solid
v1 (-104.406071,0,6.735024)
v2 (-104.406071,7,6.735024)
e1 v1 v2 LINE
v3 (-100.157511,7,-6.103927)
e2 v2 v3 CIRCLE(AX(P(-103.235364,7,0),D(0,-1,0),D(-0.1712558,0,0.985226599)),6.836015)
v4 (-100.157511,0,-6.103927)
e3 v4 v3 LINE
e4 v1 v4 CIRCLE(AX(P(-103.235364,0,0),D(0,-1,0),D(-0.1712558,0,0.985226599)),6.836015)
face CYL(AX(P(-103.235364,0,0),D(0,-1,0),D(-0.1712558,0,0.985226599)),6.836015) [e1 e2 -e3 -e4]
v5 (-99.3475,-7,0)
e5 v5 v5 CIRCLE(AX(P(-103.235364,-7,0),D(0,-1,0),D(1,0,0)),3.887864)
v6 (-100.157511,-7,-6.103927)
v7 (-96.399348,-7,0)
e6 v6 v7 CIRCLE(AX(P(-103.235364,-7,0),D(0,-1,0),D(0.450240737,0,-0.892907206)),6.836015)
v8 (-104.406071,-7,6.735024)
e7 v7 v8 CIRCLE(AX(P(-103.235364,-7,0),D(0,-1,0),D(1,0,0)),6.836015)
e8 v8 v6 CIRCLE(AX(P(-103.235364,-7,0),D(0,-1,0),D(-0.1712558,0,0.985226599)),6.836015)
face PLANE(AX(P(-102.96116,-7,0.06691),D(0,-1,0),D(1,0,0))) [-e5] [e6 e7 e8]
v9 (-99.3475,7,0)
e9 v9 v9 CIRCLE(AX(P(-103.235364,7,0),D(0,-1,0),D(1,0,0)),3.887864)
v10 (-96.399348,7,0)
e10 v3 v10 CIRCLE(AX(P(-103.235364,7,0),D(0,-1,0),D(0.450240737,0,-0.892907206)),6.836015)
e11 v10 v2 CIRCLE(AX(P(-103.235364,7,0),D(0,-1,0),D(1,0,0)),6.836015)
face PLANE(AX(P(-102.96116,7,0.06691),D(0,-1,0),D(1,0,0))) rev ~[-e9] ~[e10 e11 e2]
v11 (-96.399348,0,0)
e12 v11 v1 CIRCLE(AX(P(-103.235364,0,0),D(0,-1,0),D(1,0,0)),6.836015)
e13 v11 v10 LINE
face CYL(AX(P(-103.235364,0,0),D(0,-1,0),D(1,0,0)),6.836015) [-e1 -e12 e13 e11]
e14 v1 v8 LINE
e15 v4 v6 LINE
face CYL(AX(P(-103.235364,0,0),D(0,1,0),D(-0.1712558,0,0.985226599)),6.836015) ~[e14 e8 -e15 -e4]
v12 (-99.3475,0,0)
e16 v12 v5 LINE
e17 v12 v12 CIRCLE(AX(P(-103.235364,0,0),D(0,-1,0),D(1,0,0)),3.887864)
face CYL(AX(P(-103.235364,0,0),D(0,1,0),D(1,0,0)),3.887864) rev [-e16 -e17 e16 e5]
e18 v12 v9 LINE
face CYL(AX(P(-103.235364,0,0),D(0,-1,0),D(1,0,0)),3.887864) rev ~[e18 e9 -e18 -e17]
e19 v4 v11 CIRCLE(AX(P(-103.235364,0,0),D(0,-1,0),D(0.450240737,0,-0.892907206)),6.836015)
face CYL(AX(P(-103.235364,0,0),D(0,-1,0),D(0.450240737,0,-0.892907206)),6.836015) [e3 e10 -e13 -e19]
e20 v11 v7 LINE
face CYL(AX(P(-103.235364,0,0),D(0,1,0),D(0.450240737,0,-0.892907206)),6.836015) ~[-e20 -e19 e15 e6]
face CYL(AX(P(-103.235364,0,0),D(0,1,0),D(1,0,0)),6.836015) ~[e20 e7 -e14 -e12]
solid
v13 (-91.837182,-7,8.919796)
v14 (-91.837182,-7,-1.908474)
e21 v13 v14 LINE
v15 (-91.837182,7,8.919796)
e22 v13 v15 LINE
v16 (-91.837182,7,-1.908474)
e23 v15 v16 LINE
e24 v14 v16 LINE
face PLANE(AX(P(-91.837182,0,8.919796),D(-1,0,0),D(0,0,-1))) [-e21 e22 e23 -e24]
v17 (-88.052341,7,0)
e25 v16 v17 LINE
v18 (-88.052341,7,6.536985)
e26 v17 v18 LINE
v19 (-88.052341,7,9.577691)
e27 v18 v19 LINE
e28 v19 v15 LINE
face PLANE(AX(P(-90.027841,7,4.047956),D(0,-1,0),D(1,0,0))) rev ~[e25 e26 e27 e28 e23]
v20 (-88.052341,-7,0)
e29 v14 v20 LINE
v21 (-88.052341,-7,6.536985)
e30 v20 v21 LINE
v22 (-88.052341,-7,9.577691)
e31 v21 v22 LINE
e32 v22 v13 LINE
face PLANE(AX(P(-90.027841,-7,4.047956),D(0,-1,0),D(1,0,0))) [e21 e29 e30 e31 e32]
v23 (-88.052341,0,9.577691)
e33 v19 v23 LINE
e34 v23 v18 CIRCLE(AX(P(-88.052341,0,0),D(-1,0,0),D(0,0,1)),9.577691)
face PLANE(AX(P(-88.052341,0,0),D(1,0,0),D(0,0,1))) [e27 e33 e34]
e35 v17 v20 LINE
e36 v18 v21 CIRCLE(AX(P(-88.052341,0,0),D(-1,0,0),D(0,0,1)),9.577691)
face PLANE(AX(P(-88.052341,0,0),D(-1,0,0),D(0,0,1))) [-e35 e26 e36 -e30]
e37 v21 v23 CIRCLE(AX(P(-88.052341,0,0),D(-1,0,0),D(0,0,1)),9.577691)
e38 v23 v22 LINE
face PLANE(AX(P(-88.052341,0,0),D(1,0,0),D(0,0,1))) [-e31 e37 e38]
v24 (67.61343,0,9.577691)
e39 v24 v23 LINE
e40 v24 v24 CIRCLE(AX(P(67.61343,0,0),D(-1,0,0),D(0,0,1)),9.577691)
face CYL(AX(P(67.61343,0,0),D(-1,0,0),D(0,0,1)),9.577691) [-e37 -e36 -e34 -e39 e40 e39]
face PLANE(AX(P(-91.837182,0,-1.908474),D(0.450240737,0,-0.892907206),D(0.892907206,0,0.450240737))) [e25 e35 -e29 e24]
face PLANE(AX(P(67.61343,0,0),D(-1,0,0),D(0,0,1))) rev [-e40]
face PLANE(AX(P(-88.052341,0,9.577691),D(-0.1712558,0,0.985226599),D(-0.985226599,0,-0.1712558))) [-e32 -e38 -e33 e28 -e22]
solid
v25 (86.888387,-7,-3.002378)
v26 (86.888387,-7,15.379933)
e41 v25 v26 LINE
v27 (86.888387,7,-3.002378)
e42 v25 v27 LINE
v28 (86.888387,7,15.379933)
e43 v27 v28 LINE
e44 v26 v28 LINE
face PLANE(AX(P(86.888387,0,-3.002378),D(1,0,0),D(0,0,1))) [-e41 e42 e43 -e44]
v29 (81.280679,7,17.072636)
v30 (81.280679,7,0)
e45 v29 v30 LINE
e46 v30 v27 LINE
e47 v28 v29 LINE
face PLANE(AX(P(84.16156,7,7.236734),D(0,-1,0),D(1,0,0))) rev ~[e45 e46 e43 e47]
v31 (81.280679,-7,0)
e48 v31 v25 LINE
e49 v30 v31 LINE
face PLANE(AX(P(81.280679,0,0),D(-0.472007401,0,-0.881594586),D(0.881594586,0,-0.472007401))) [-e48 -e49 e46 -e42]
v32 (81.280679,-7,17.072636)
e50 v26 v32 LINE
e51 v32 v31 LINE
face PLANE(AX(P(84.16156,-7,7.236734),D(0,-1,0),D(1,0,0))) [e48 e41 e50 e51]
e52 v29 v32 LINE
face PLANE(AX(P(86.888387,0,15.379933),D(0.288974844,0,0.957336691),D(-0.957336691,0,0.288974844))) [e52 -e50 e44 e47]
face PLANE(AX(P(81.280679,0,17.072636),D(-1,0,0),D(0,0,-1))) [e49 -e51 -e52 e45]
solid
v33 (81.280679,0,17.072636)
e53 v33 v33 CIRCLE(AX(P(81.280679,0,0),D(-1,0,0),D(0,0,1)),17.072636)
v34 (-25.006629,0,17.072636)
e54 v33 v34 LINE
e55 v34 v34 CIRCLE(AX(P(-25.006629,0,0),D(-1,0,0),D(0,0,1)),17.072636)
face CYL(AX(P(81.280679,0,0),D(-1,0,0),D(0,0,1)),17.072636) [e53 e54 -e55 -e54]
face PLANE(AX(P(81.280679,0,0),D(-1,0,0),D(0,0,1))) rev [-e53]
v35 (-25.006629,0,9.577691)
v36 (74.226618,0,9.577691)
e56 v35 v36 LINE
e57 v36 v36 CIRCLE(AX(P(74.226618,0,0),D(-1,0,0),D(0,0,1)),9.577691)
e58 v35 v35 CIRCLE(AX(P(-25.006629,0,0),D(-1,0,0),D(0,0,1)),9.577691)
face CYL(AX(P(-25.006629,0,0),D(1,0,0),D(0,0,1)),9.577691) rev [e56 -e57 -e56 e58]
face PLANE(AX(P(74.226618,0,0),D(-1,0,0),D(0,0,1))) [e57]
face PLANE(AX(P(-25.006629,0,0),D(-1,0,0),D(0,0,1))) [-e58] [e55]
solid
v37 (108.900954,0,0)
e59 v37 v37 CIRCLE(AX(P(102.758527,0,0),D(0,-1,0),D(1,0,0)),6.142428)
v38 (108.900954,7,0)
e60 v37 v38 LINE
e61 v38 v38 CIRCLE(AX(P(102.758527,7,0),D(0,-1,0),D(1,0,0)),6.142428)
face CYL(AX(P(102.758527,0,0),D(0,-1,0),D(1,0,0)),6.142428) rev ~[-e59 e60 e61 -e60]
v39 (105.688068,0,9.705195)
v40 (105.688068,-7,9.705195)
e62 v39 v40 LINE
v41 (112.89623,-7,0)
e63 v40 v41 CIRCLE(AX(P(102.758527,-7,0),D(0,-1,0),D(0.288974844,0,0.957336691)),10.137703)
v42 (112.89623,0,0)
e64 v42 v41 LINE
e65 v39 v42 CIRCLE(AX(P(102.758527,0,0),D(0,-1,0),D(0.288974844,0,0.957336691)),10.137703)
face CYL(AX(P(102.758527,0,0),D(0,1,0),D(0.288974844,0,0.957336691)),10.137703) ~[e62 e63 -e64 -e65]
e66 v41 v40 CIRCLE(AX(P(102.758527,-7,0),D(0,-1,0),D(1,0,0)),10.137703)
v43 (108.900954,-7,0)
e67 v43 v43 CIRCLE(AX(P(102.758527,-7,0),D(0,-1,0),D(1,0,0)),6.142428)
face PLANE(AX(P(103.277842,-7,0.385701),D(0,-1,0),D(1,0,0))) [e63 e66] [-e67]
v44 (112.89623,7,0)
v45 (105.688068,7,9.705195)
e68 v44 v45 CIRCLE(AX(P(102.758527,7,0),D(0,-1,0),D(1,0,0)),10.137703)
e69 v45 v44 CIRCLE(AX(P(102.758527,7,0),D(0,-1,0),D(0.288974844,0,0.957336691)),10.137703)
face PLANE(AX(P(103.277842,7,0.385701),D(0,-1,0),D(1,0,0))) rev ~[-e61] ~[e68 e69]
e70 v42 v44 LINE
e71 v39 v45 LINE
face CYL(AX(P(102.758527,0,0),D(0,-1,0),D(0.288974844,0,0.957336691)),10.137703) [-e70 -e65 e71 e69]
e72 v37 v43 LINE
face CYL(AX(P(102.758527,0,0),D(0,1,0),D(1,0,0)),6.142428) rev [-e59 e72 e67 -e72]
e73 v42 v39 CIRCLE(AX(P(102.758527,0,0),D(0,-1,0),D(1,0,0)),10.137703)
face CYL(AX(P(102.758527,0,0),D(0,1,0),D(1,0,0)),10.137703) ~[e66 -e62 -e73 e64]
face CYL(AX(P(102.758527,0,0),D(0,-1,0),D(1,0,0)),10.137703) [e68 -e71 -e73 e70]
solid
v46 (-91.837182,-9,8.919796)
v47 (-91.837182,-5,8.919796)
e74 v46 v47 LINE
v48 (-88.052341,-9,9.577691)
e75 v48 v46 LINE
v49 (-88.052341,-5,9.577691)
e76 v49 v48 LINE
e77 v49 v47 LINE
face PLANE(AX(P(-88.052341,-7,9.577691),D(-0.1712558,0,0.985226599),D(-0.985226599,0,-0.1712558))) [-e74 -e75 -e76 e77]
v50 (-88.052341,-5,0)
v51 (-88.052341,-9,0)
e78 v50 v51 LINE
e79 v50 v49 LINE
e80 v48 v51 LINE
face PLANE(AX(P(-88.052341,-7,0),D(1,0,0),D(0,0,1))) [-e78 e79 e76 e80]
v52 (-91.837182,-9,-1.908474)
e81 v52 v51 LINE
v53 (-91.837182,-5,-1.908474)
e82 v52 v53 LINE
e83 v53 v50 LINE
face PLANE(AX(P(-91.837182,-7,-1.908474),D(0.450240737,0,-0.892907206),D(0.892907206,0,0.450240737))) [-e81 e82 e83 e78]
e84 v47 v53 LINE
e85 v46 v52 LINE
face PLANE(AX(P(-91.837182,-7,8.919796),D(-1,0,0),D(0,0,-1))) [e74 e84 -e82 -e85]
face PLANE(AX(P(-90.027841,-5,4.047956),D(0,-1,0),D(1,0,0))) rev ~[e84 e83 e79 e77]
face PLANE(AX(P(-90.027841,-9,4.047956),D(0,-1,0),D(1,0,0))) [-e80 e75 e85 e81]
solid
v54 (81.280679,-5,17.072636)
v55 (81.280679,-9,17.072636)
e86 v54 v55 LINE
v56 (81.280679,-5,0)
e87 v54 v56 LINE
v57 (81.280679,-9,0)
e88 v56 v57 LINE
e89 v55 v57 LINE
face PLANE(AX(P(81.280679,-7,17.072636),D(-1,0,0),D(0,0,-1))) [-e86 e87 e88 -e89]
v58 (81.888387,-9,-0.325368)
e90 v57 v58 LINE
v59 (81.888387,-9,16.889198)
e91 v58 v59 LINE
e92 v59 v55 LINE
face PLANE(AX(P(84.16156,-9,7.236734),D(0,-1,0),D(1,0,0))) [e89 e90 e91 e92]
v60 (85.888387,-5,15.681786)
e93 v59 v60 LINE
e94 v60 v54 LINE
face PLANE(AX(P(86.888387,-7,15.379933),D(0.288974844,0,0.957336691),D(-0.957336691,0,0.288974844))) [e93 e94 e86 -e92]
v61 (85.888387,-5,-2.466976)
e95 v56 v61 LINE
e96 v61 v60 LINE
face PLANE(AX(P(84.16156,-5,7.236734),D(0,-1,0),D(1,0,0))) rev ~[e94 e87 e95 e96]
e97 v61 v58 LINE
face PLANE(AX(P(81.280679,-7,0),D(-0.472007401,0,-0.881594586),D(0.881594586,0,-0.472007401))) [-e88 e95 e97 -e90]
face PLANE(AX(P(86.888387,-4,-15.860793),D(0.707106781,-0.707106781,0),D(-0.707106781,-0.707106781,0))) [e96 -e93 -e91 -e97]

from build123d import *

# Parameters (mm, degrees)
F3_DEPTH    = 7
F0_R        = 3.8878640564
F0_R_2      = 6.1424275905
F4_DEPTH    = 2
F5_T1_DEPTH = 44.0991409969


# Not quite as in the source:
# - a fillet or chamfer that OpenCascade refuses, or shapes differently, is made with other operations: its cross-section is extruded or revolved along the edge and cut away or added


with BuildPart() as f1:
    # F0 (on Front) → F1 (revolve)
    with BuildSketch(Plane.XZ):
        Polygon((-25.0066287739, 17.072636364), (-25.0066287739, 9.5776912849), (67.6134303212, 9.5776912849), (74.2266178131, 9.5776912849), (74.2266178131, 0), (81.2806785107, 0), (81.2806785107, 17.072636364), align=None)
    revolve(axis=Axis((-10.2194553203, 0, 0), (-1, 0, 0)))


with BuildPart() as f2:
    # F0 (on Front) → F2 (revolve)
    with BuildSketch(Plane.XZ):
        Polygon((-88.0523409618, 9.5776912849), (-88.0523409618, 0), (67.6134303212, 0), (67.6134303212, 9.5776912849), (-25.0066287739, 9.5776912849), align=None)
    revolve(axis=Axis((-10.2194553203, 0, 0), (-1, 0, 0)))

    # F0 (on Front) → F3 (join, symmetric)
    with BuildSketch(Plane.XZ):
        Polygon((-91.8371824493, -1.9084735904), (-88.0523409618, 0), (-88.0523409618, 9.5776912849), (-91.8371824493, 8.9197958771), align=None)
    extrude(amount=F3_DEPTH, both=True)


with BuildPart() as f3:
    # F0 (on Front) → F3, piece 2 (new body, symmetric)
    with BuildSketch(Plane.XZ):
        with BuildLine():
            ThreePointArc((-104.4060712545, 6.7350242686), (-109.725277002, -2.1475884562), (-100.1575113171, -6.1039274712))
            ThreePointArc((-100.1575113171, -6.1039274712), (-97.4142233615, -3.5840521197), (-96.3993484931, 0))
            ThreePointArc((-96.3993484931, 0), (-98.8349018086, 5.2313516723), (-104.4060712545, 6.7350242686))
        make_face()
        with Locations((-103.2353639603, 0)):
            Circle(F0_R, mode=Mode.SUBTRACT)
    extrude(amount=F3_DEPTH, both=True)


with BuildPart() as f3b:
    # F0 (on Front) → F3, piece 3 (new body, symmetric)
    with BuildSketch(Plane.XZ):
        Polygon((86.8883872816, 15.3799332838), (81.2806785107, 17.072636364), (81.2806785107, 0), (86.8883872816, -3.0023778334), align=None)
    extrude(amount=F3_DEPTH, both=True)


with BuildPart() as f3c:
    # F0 (on Front) → F3, piece 4 (new body, symmetric)
    with BuildSketch(Plane.XZ):
        with BuildLine():
            ThreePointArc((112.8962301513, 0), (110.8970724106, 6.0445930034), (105.6880680425, 9.7051953777))
            ThreePointArc((105.6880680425, 9.7051953777), (93.3911995488, 3.8763654791), (97.9734557929, -8.9373443838))
            ThreePointArc((97.9734557929, -8.9373443838), (107.9673365894, -8.6972024121), (112.8962301513, 0))
        make_face()
        with Locations((102.7585268021, 0)):
            Circle(F0_R_2, mode=Mode.SUBTRACT)
    extrude(amount=F3_DEPTH, both=True)


with BuildPart() as f4:
    # F4 (new, symmetric): a face of the model
    f4_faces = [f3b.part.faces().sort_by_distance(p)[0] for p in [
        (84.1190568725, -7, 7.3480952717),
    ]]
    extrude(f4_faces, amount=F4_DEPTH, both=True)

    # F5: chamfer of 5 on 1 edges, made by hand

    # F5_s2 → F5_t1 (cut)
    with BuildSketch(Plane.XY.offset(-15.8607927732)):
        Polygon((86.8883872816, -4), (81.8883872816, -9), (86.8883872816, -9), align=None)
    extrude(amount=F5_T1_DEPTH, mode=Mode.SUBTRACT)


with BuildPart() as f4b:
    # F4#2 (new, symmetric): a face of the model
    f4_2_faces = [f2.part.faces().sort_by_distance(p)[0] for p in [
        (-89.9834206726, -7, 4.1341467443),
    ]]
    extrude(f4_2_faces, amount=F4_DEPTH, both=True)


solid = Compound([f1.part, f2.part, f3.part, f3b.part, f3c.part, f4.part, f4b.part])
